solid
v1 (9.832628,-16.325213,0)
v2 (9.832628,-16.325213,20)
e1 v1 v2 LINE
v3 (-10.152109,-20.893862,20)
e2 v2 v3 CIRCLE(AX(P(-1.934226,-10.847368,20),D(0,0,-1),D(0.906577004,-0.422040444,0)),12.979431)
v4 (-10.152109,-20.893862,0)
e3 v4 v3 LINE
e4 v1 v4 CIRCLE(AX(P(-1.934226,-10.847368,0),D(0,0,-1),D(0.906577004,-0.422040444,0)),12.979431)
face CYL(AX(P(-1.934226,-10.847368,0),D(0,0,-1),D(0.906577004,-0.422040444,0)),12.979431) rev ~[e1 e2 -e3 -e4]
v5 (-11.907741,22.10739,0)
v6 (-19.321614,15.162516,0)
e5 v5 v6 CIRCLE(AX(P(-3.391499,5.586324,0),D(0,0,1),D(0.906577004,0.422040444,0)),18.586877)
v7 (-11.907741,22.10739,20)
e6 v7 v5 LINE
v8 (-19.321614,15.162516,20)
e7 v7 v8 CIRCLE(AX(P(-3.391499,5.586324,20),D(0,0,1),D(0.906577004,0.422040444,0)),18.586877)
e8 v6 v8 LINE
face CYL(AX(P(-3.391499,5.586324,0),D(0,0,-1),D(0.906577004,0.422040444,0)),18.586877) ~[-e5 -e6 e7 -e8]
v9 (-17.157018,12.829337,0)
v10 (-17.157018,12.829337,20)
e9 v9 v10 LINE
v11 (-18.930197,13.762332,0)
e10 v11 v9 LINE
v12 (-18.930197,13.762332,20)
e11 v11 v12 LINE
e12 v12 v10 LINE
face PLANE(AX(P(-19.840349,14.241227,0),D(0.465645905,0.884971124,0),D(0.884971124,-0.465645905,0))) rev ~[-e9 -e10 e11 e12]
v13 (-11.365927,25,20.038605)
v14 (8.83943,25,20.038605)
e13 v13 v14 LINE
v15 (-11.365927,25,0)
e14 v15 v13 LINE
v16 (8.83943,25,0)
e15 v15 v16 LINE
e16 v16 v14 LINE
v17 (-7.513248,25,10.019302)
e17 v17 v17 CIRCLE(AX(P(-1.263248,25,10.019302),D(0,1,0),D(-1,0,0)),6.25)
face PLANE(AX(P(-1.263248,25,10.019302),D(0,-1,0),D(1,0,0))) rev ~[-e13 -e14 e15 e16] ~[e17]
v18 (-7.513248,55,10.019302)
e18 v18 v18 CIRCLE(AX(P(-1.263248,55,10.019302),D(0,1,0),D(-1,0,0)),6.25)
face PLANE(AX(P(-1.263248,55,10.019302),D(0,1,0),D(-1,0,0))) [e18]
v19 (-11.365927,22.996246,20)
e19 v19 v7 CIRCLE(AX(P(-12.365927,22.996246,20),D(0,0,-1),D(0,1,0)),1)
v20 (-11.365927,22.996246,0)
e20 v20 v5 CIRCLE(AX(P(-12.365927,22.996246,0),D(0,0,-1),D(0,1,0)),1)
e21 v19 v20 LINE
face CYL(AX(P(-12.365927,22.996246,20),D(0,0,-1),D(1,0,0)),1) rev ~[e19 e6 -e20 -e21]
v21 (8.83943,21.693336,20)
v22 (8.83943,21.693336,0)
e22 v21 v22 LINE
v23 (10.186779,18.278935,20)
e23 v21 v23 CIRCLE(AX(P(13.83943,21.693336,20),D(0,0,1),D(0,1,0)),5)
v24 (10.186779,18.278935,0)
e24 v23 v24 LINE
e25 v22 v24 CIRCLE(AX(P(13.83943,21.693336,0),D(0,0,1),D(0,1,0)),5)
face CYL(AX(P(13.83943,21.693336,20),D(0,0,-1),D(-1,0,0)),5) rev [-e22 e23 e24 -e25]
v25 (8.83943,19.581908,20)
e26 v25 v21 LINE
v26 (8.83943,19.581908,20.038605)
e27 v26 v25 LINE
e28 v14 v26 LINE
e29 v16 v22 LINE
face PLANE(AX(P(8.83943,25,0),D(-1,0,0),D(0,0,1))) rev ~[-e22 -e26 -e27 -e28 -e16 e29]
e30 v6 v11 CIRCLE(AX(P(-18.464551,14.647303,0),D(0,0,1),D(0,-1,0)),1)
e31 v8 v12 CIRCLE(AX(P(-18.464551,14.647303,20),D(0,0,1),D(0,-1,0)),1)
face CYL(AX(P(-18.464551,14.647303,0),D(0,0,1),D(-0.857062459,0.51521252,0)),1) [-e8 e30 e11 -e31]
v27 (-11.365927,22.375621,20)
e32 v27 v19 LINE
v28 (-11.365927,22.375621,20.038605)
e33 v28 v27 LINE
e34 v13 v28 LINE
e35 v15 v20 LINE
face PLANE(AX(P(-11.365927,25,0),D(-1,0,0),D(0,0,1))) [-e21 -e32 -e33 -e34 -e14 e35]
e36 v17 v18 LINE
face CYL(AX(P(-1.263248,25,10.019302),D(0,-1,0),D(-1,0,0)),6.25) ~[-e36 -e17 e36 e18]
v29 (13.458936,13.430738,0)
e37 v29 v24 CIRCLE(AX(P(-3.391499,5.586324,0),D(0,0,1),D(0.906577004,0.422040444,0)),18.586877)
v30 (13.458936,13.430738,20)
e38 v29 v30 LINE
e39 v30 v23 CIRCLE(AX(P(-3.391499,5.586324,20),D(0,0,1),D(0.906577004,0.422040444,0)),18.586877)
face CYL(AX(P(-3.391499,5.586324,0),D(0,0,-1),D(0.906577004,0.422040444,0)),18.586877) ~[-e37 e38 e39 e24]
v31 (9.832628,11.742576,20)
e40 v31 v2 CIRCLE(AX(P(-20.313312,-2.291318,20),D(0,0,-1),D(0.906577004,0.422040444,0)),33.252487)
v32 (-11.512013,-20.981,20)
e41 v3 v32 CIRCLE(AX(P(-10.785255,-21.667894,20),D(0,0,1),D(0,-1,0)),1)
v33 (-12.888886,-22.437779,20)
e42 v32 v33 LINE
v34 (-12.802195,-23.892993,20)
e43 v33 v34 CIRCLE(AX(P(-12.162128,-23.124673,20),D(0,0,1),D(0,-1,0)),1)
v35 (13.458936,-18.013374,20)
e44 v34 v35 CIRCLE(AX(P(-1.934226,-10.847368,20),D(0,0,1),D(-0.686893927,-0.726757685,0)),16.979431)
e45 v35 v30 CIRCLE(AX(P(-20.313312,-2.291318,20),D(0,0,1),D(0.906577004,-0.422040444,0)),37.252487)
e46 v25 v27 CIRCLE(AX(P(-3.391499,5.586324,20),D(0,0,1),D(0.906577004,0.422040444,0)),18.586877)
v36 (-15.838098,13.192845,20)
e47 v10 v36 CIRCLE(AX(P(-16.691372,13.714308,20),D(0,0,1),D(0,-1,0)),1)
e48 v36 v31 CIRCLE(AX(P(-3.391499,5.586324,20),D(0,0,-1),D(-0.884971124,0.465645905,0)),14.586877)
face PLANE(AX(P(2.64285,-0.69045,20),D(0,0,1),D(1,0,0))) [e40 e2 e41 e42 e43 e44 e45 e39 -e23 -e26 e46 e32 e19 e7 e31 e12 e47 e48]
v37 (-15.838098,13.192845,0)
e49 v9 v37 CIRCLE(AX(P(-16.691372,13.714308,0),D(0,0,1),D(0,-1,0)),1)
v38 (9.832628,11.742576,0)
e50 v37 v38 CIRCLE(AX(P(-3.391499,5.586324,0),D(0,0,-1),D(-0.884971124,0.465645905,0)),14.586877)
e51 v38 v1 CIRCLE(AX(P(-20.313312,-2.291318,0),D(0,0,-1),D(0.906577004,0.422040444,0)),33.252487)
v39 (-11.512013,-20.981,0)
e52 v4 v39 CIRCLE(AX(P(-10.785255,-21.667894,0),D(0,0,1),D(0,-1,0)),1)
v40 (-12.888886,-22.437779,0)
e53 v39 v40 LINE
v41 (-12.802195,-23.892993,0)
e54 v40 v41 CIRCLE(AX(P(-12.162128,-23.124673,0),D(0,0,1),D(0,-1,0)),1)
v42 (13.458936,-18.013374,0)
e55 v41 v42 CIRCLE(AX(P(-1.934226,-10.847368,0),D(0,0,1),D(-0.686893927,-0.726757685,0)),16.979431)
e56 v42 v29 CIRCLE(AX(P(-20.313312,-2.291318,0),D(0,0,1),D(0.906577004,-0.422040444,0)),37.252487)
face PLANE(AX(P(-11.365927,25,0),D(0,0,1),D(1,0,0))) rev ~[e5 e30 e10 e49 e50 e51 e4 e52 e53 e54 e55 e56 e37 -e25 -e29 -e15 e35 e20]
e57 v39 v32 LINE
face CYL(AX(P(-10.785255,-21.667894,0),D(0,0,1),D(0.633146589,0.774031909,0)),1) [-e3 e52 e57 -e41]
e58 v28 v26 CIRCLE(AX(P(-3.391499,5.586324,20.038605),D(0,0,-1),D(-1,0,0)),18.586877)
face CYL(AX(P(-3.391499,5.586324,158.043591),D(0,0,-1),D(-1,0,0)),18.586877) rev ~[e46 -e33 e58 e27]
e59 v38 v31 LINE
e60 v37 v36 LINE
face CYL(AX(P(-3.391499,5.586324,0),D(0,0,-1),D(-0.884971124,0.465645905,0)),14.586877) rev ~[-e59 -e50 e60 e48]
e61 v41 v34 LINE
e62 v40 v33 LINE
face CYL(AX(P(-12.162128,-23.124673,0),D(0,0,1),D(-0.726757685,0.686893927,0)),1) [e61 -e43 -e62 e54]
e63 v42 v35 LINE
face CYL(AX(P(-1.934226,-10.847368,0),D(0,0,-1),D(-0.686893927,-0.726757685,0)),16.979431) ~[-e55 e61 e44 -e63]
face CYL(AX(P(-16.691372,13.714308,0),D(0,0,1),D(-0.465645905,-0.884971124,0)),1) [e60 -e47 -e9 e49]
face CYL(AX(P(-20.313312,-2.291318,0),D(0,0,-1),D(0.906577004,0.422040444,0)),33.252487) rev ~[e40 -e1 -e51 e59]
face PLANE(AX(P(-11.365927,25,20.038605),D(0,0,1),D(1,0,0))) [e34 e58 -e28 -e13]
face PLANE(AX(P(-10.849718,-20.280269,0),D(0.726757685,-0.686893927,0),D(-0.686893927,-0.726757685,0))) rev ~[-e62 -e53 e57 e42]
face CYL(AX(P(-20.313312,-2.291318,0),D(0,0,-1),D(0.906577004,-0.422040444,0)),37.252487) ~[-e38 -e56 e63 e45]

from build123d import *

# Parameters (mm, degrees)
F1_DEPTH      = 20
F4_END_RADIUS = 18.58687693
F3_W          = 20.205357112
F3_H          = 20.0386047363
F4_REACH      = 81.284821593
F5_R          = 1
F6_R          = 5
F7_R          = 1
F8_R          = 6.25
F9_DEPTH      = 30


# Not quite as in the source:
# - a feature of the source that left no trace in its solid (it failed there, or was rolled back) is left out


with BuildPart() as f1:
    # F0 (on Top) → F1 (new body)
    with BuildSketch(Plane.XY):
        with BuildLine():
            ThreePointArc((-16.300464081, 12.3786436003), (-3.0365664125, 20.1688822052), (9.8326279785, 11.7425760982))
            ThreePointArc((9.8326279785, 11.7425760982), (12.939174946, -2.2913182786), (9.8326279785, -16.3252126554))
            ThreePointArc((9.8326279785, -16.3252126554), (0.5036385974, -23.5957971339), (-10.8497184243, -20.2802691412))
            Line((-10.8497184243, -20.2802691412), (-13.5972941331, -23.1872998815))
            ThreePointArc((-13.5972941331, -23.1872998815), (1.2549394728, -27.5246070039), (13.4589359939, -18.0133744302))
            ThreePointArc((13.4589359939, -18.0133744302), (16.939174946, -2.2913182786), (13.4589359939, 13.430737873))
            ThreePointArc((13.4589359939, 13.430737873), (-2.9392370682, 24.1676979047), (-19.8403485782, 14.2412272216))
            Line((-19.8403485782, 14.2412272216), (-16.300464081, 12.3786436003))
        make_face()
    extrude(amount=F1_DEPTH)

    f4_end = (Plane(origin=(-3.391499204, 5.5863240865, 10), x_dir=(-1, 0, 0), z_dir=(0, 0, -1)) * Cylinder(F4_END_RADIUS, 296.0871828679, mode=Mode.PRIVATE)).faces().sort_by_distance((-2.9392370682, 24.1676979047, 10))[0]
    # F3 (on offset) → F4 (join, up to the whole of a round face its end follows)
    with BuildSketch(Plane.XZ.offset(-25)):
        with Locations((-1.2632482685, 10.0193023682)):
            Rectangle(F3_W, F3_H)
    f4_long = extrude(amount=F4_REACH, mode=Mode.PRIVATE)
    add(split(f4_long, bisect_by=f4_end, keep=Keep.ALL, mode=Mode.PRIVATE).solids().sort_by_distance((-1.2632482685, 25, 10.0193023682))[0])

    # F5
    f5_edges = [f1.edges().sort_by_distance(p)[0] for p in [
        (-16.300464, 12.378644, 10),
        (-19.840349, 14.241227, 10),
        (-10.849718, -20.280269, 10),
        (-13.597294, -23.1873, 10),
    ]]
    fillet(f5_edges, radius=F5_R)

    # F6
    f6_edges = [f1.edges().sort_by_distance(p)[0] for p in [
        (8.83943, 19.581908, 10),
    ]]
    fillet(f6_edges, radius=F6_R)

    # F7
    f7_edges = [f1.edges().sort_by_distance(p)[0] for p in [
        (-11.365927, 22.375621, 10),
    ]]
    fillet(f7_edges, radius=F7_R)

    # F8 (on face) → F9 (join)
    with BuildSketch(Plane(origin=(0, 25, 0), x_dir=(-1, 0, 0), z_dir=(0, 1, 0))):
        with Locations((1.2632482685, 10.0193023682)):
            Circle(F8_R)
    extrude(amount=F9_DEPTH)


solid = f1.part
